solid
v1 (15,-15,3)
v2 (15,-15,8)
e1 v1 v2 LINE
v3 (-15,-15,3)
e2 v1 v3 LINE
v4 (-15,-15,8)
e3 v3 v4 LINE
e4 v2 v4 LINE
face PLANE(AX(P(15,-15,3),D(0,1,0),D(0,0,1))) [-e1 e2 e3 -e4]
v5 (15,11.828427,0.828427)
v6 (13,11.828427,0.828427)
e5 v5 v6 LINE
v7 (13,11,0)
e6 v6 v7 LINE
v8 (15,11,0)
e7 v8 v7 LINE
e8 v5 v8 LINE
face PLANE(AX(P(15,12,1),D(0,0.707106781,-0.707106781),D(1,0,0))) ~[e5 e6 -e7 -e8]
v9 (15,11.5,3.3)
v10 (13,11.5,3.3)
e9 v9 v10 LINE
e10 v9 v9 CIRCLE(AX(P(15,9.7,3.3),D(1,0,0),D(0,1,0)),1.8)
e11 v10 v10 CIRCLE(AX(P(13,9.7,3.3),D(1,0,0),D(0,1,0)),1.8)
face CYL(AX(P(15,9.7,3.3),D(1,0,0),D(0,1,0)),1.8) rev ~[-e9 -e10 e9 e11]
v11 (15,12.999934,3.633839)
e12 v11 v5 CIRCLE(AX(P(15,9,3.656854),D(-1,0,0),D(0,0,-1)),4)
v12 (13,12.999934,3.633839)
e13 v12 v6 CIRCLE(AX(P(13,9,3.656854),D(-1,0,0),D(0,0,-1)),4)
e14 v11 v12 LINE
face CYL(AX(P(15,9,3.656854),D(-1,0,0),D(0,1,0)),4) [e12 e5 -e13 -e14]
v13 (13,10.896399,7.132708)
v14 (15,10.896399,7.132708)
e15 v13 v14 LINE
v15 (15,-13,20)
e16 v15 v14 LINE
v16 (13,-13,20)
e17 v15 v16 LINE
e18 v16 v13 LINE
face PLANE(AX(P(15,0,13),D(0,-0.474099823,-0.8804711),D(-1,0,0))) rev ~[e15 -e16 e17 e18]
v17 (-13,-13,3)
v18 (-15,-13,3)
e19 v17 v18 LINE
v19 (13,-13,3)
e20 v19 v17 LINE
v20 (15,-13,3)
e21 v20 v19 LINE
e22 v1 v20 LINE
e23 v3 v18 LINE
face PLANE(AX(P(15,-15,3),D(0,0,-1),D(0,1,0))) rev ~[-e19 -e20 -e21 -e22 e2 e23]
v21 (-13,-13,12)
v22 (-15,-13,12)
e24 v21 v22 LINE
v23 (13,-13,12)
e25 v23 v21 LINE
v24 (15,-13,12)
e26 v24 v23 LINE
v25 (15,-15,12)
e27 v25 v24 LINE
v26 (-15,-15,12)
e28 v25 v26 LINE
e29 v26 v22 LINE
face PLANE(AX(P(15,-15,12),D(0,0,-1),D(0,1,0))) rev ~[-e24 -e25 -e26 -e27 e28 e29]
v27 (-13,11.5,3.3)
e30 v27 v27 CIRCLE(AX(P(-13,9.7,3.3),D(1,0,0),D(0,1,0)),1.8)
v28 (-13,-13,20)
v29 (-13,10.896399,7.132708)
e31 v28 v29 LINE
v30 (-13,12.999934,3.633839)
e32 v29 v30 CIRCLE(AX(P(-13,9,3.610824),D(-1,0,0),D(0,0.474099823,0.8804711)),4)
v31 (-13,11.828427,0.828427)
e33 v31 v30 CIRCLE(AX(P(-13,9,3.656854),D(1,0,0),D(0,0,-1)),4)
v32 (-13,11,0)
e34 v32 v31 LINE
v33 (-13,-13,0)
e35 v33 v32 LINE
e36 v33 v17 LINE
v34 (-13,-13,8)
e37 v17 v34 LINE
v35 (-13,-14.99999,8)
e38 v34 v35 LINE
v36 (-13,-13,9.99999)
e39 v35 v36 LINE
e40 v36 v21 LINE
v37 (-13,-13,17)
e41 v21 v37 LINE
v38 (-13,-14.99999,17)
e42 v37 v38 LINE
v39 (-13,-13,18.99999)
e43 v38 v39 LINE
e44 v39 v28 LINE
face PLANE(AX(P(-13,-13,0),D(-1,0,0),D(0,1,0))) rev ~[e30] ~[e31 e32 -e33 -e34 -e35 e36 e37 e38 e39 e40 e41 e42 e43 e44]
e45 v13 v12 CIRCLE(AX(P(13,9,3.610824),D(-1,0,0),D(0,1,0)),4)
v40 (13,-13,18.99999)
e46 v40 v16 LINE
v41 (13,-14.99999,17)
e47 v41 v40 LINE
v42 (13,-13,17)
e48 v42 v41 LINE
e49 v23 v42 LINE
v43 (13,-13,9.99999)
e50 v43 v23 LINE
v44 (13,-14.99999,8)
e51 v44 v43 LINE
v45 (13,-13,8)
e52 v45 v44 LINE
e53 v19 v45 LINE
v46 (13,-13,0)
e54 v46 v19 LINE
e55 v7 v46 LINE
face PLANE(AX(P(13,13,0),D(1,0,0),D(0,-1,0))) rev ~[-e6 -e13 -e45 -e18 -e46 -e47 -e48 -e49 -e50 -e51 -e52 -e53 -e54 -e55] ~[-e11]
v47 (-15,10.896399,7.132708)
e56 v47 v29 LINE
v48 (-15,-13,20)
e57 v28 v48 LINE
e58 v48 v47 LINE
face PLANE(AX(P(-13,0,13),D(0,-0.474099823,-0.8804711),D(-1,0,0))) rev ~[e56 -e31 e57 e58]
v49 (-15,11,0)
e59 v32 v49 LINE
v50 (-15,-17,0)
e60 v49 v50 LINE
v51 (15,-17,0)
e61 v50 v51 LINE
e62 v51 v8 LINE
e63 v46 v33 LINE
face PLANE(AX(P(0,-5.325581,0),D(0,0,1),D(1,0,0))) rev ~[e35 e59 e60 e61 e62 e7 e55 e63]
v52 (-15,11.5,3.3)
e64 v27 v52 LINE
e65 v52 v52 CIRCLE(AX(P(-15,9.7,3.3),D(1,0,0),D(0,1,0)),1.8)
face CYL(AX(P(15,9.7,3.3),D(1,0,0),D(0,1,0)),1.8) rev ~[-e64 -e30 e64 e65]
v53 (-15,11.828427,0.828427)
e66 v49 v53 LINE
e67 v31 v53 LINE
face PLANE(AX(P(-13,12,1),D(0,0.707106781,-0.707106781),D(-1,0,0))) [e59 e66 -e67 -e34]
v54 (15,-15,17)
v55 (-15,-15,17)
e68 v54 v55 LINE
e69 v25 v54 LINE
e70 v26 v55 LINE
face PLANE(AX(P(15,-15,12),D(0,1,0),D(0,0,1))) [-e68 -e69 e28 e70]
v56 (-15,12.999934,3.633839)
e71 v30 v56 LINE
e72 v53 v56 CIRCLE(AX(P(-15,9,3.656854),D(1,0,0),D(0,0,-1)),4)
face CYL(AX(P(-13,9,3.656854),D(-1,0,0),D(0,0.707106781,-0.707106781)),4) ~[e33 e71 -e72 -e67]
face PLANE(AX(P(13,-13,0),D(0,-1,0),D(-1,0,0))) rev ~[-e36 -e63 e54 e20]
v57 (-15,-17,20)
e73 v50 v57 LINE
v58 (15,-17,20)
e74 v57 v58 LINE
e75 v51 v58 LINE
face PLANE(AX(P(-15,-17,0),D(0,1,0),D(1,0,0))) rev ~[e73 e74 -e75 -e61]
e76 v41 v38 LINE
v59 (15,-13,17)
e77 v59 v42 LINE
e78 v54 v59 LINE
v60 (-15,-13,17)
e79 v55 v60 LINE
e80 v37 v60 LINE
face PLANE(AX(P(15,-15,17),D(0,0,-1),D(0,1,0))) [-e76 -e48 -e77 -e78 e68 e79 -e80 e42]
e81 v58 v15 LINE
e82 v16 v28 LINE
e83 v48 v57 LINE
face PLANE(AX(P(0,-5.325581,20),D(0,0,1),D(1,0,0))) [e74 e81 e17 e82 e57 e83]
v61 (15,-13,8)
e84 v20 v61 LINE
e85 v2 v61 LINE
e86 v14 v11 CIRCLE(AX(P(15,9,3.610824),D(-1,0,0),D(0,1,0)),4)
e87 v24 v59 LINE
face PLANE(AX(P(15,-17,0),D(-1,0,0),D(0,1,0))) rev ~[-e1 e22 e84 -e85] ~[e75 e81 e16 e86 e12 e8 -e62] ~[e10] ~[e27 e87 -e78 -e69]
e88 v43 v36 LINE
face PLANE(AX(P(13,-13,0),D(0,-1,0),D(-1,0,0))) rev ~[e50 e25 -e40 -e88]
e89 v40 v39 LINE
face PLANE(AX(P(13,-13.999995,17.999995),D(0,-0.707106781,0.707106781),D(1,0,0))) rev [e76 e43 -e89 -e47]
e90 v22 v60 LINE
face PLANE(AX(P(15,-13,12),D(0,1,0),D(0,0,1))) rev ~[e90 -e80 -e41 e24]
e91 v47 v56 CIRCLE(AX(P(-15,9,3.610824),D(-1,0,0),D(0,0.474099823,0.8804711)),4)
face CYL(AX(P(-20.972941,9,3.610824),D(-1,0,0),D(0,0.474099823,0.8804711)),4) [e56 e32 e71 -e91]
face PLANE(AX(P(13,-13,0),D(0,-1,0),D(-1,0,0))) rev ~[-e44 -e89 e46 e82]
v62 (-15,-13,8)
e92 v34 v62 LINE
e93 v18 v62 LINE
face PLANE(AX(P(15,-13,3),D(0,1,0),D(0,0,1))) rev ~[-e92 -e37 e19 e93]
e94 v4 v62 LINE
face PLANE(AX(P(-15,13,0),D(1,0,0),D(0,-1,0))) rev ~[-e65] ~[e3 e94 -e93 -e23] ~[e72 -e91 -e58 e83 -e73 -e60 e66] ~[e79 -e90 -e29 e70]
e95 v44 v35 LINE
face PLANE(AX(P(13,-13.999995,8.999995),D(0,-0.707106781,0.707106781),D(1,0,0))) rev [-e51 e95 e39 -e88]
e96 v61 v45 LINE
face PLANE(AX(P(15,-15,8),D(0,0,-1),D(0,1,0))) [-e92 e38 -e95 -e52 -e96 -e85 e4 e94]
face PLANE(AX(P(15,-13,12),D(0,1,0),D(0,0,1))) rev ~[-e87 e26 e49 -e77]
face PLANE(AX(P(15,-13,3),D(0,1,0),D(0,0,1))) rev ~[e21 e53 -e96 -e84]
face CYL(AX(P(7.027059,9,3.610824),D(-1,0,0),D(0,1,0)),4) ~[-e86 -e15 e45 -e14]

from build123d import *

# Parameters (mm, degrees)
F1_DEPTH    = 20
F2_R        = 1.8
F3_DEPTH    = 30.001
F4_SIZE2    = 14
F4_SIZE     = 26
F5_SIZE     = 2
F6_R        = 4
F7_T1_DEPTH = 13.9458816311
F7_T3_DEPTH = 13.9458816311
F8_W        = 2
F8_H        = 5
F9_DEPTH    = 30.001
F10_SIZE    = 1.99999


# Not quite as in the source:
# - a fillet or chamfer that OpenCascade refuses, or shapes differently, is made with other operations: its cross-section is extruded or revolved along the edge and cut away or added
# - a fillet or chamfer is up to 0.001 mm smaller than in the source, because OpenCascade refuses the exact size


with BuildPart() as f1:
    # F0 (on Top) → F1 (new body)
    with BuildSketch(Plane.XY):
        Polygon((15, 13), (13, 13), (13, -13), (-13, -13), (-13, 13), (-15, 13), (-15, -17), (15, -17), align=None)
    extrude(amount=F1_DEPTH)

    # F2 (on face) → F3 (cut, through all)
    with BuildSketch(Plane.YZ.offset(15)):
        with Locations((9.7, 3.3)):
            Circle(F2_R)
    extrude(amount=-F3_DEPTH, mode=Mode.SUBTRACT)

    # F4
    f4_edges = [f1.edges().sort_by_distance(p)[0] for p in [
        (14, 13, 20),
        (-14, 13, 20),
    ]]
    f4_side = f1.faces().sort_by_distance((14, 12.575736, 20))[0]
    chamfer(f4_edges, length=F4_SIZE, length2=F4_SIZE2, reference=f4_side)

    # F5
    f5_edges = [f1.edges().sort_by_distance(p)[0] for p in [
        (14, 13, 0),
        (-14, 13, 0),
    ]]
    chamfer(f5_edges, length=F5_SIZE)

    # F6
    f6_edges = [f1.edges().sort_by_distance(p)[0] for p in [
        (14, 13, 2),
        (-14, 13, 2),
    ]]
    fillet(f6_edges, radius=F6_R)

    # F7: fillet of radius 4 on 2 edges, made by hand

    # F7_s2 → F7_t1 (cut)
    with BuildSketch(Plane.YZ.offset(7.0270591844)):
        with BuildLine():
            ThreePointArc((13, 3.6108236738), (12.4340644409, 5.66197004), (10.8963992921, 7.1327080735))
            Line((10.8963992921, 7.1327080735), (13, 6))
            Line((13, 6), (13, 3.6108236738))
        make_face()
    extrude(amount=F7_T1_DEPTH, mode=Mode.SUBTRACT)

    # F7_s4 → F7_t3 (cut)
    with BuildSketch(Plane.YZ.offset(-20.9729408156)):
        with BuildLine():
            ThreePointArc((10.8963992921, 7.1327080735), (12.4340644409, 5.66197004), (13, 3.6108236738))
            Line((13, 3.6108236738), (13, 6))
            Line((13, 6), (10.8963992921, 7.1327080735))
        make_face()
    extrude(amount=F7_T3_DEPTH, mode=Mode.SUBTRACT)

    # F8 (on face) → F9 (cut, through all)
    with BuildSketch(Plane.YZ.offset(15)):
        with Locations((-14, 14.5)):
            Rectangle(F8_W, F8_H)
        with Locations((-14, 5.5)):
            Rectangle(F8_W, F8_H)
    extrude(amount=-F9_DEPTH, mode=Mode.SUBTRACT)

    # F10 (size 2 in the source; OpenCascade refuses exactly that, so slightly less here)
    f10_edges = [f1.edges().sort_by_distance(p)[0] for p in [
        (0, -13, 8),
        (0, -13, 17),
    ]]
    chamfer(f10_edges, length=F10_SIZE)


solid = f1.part
